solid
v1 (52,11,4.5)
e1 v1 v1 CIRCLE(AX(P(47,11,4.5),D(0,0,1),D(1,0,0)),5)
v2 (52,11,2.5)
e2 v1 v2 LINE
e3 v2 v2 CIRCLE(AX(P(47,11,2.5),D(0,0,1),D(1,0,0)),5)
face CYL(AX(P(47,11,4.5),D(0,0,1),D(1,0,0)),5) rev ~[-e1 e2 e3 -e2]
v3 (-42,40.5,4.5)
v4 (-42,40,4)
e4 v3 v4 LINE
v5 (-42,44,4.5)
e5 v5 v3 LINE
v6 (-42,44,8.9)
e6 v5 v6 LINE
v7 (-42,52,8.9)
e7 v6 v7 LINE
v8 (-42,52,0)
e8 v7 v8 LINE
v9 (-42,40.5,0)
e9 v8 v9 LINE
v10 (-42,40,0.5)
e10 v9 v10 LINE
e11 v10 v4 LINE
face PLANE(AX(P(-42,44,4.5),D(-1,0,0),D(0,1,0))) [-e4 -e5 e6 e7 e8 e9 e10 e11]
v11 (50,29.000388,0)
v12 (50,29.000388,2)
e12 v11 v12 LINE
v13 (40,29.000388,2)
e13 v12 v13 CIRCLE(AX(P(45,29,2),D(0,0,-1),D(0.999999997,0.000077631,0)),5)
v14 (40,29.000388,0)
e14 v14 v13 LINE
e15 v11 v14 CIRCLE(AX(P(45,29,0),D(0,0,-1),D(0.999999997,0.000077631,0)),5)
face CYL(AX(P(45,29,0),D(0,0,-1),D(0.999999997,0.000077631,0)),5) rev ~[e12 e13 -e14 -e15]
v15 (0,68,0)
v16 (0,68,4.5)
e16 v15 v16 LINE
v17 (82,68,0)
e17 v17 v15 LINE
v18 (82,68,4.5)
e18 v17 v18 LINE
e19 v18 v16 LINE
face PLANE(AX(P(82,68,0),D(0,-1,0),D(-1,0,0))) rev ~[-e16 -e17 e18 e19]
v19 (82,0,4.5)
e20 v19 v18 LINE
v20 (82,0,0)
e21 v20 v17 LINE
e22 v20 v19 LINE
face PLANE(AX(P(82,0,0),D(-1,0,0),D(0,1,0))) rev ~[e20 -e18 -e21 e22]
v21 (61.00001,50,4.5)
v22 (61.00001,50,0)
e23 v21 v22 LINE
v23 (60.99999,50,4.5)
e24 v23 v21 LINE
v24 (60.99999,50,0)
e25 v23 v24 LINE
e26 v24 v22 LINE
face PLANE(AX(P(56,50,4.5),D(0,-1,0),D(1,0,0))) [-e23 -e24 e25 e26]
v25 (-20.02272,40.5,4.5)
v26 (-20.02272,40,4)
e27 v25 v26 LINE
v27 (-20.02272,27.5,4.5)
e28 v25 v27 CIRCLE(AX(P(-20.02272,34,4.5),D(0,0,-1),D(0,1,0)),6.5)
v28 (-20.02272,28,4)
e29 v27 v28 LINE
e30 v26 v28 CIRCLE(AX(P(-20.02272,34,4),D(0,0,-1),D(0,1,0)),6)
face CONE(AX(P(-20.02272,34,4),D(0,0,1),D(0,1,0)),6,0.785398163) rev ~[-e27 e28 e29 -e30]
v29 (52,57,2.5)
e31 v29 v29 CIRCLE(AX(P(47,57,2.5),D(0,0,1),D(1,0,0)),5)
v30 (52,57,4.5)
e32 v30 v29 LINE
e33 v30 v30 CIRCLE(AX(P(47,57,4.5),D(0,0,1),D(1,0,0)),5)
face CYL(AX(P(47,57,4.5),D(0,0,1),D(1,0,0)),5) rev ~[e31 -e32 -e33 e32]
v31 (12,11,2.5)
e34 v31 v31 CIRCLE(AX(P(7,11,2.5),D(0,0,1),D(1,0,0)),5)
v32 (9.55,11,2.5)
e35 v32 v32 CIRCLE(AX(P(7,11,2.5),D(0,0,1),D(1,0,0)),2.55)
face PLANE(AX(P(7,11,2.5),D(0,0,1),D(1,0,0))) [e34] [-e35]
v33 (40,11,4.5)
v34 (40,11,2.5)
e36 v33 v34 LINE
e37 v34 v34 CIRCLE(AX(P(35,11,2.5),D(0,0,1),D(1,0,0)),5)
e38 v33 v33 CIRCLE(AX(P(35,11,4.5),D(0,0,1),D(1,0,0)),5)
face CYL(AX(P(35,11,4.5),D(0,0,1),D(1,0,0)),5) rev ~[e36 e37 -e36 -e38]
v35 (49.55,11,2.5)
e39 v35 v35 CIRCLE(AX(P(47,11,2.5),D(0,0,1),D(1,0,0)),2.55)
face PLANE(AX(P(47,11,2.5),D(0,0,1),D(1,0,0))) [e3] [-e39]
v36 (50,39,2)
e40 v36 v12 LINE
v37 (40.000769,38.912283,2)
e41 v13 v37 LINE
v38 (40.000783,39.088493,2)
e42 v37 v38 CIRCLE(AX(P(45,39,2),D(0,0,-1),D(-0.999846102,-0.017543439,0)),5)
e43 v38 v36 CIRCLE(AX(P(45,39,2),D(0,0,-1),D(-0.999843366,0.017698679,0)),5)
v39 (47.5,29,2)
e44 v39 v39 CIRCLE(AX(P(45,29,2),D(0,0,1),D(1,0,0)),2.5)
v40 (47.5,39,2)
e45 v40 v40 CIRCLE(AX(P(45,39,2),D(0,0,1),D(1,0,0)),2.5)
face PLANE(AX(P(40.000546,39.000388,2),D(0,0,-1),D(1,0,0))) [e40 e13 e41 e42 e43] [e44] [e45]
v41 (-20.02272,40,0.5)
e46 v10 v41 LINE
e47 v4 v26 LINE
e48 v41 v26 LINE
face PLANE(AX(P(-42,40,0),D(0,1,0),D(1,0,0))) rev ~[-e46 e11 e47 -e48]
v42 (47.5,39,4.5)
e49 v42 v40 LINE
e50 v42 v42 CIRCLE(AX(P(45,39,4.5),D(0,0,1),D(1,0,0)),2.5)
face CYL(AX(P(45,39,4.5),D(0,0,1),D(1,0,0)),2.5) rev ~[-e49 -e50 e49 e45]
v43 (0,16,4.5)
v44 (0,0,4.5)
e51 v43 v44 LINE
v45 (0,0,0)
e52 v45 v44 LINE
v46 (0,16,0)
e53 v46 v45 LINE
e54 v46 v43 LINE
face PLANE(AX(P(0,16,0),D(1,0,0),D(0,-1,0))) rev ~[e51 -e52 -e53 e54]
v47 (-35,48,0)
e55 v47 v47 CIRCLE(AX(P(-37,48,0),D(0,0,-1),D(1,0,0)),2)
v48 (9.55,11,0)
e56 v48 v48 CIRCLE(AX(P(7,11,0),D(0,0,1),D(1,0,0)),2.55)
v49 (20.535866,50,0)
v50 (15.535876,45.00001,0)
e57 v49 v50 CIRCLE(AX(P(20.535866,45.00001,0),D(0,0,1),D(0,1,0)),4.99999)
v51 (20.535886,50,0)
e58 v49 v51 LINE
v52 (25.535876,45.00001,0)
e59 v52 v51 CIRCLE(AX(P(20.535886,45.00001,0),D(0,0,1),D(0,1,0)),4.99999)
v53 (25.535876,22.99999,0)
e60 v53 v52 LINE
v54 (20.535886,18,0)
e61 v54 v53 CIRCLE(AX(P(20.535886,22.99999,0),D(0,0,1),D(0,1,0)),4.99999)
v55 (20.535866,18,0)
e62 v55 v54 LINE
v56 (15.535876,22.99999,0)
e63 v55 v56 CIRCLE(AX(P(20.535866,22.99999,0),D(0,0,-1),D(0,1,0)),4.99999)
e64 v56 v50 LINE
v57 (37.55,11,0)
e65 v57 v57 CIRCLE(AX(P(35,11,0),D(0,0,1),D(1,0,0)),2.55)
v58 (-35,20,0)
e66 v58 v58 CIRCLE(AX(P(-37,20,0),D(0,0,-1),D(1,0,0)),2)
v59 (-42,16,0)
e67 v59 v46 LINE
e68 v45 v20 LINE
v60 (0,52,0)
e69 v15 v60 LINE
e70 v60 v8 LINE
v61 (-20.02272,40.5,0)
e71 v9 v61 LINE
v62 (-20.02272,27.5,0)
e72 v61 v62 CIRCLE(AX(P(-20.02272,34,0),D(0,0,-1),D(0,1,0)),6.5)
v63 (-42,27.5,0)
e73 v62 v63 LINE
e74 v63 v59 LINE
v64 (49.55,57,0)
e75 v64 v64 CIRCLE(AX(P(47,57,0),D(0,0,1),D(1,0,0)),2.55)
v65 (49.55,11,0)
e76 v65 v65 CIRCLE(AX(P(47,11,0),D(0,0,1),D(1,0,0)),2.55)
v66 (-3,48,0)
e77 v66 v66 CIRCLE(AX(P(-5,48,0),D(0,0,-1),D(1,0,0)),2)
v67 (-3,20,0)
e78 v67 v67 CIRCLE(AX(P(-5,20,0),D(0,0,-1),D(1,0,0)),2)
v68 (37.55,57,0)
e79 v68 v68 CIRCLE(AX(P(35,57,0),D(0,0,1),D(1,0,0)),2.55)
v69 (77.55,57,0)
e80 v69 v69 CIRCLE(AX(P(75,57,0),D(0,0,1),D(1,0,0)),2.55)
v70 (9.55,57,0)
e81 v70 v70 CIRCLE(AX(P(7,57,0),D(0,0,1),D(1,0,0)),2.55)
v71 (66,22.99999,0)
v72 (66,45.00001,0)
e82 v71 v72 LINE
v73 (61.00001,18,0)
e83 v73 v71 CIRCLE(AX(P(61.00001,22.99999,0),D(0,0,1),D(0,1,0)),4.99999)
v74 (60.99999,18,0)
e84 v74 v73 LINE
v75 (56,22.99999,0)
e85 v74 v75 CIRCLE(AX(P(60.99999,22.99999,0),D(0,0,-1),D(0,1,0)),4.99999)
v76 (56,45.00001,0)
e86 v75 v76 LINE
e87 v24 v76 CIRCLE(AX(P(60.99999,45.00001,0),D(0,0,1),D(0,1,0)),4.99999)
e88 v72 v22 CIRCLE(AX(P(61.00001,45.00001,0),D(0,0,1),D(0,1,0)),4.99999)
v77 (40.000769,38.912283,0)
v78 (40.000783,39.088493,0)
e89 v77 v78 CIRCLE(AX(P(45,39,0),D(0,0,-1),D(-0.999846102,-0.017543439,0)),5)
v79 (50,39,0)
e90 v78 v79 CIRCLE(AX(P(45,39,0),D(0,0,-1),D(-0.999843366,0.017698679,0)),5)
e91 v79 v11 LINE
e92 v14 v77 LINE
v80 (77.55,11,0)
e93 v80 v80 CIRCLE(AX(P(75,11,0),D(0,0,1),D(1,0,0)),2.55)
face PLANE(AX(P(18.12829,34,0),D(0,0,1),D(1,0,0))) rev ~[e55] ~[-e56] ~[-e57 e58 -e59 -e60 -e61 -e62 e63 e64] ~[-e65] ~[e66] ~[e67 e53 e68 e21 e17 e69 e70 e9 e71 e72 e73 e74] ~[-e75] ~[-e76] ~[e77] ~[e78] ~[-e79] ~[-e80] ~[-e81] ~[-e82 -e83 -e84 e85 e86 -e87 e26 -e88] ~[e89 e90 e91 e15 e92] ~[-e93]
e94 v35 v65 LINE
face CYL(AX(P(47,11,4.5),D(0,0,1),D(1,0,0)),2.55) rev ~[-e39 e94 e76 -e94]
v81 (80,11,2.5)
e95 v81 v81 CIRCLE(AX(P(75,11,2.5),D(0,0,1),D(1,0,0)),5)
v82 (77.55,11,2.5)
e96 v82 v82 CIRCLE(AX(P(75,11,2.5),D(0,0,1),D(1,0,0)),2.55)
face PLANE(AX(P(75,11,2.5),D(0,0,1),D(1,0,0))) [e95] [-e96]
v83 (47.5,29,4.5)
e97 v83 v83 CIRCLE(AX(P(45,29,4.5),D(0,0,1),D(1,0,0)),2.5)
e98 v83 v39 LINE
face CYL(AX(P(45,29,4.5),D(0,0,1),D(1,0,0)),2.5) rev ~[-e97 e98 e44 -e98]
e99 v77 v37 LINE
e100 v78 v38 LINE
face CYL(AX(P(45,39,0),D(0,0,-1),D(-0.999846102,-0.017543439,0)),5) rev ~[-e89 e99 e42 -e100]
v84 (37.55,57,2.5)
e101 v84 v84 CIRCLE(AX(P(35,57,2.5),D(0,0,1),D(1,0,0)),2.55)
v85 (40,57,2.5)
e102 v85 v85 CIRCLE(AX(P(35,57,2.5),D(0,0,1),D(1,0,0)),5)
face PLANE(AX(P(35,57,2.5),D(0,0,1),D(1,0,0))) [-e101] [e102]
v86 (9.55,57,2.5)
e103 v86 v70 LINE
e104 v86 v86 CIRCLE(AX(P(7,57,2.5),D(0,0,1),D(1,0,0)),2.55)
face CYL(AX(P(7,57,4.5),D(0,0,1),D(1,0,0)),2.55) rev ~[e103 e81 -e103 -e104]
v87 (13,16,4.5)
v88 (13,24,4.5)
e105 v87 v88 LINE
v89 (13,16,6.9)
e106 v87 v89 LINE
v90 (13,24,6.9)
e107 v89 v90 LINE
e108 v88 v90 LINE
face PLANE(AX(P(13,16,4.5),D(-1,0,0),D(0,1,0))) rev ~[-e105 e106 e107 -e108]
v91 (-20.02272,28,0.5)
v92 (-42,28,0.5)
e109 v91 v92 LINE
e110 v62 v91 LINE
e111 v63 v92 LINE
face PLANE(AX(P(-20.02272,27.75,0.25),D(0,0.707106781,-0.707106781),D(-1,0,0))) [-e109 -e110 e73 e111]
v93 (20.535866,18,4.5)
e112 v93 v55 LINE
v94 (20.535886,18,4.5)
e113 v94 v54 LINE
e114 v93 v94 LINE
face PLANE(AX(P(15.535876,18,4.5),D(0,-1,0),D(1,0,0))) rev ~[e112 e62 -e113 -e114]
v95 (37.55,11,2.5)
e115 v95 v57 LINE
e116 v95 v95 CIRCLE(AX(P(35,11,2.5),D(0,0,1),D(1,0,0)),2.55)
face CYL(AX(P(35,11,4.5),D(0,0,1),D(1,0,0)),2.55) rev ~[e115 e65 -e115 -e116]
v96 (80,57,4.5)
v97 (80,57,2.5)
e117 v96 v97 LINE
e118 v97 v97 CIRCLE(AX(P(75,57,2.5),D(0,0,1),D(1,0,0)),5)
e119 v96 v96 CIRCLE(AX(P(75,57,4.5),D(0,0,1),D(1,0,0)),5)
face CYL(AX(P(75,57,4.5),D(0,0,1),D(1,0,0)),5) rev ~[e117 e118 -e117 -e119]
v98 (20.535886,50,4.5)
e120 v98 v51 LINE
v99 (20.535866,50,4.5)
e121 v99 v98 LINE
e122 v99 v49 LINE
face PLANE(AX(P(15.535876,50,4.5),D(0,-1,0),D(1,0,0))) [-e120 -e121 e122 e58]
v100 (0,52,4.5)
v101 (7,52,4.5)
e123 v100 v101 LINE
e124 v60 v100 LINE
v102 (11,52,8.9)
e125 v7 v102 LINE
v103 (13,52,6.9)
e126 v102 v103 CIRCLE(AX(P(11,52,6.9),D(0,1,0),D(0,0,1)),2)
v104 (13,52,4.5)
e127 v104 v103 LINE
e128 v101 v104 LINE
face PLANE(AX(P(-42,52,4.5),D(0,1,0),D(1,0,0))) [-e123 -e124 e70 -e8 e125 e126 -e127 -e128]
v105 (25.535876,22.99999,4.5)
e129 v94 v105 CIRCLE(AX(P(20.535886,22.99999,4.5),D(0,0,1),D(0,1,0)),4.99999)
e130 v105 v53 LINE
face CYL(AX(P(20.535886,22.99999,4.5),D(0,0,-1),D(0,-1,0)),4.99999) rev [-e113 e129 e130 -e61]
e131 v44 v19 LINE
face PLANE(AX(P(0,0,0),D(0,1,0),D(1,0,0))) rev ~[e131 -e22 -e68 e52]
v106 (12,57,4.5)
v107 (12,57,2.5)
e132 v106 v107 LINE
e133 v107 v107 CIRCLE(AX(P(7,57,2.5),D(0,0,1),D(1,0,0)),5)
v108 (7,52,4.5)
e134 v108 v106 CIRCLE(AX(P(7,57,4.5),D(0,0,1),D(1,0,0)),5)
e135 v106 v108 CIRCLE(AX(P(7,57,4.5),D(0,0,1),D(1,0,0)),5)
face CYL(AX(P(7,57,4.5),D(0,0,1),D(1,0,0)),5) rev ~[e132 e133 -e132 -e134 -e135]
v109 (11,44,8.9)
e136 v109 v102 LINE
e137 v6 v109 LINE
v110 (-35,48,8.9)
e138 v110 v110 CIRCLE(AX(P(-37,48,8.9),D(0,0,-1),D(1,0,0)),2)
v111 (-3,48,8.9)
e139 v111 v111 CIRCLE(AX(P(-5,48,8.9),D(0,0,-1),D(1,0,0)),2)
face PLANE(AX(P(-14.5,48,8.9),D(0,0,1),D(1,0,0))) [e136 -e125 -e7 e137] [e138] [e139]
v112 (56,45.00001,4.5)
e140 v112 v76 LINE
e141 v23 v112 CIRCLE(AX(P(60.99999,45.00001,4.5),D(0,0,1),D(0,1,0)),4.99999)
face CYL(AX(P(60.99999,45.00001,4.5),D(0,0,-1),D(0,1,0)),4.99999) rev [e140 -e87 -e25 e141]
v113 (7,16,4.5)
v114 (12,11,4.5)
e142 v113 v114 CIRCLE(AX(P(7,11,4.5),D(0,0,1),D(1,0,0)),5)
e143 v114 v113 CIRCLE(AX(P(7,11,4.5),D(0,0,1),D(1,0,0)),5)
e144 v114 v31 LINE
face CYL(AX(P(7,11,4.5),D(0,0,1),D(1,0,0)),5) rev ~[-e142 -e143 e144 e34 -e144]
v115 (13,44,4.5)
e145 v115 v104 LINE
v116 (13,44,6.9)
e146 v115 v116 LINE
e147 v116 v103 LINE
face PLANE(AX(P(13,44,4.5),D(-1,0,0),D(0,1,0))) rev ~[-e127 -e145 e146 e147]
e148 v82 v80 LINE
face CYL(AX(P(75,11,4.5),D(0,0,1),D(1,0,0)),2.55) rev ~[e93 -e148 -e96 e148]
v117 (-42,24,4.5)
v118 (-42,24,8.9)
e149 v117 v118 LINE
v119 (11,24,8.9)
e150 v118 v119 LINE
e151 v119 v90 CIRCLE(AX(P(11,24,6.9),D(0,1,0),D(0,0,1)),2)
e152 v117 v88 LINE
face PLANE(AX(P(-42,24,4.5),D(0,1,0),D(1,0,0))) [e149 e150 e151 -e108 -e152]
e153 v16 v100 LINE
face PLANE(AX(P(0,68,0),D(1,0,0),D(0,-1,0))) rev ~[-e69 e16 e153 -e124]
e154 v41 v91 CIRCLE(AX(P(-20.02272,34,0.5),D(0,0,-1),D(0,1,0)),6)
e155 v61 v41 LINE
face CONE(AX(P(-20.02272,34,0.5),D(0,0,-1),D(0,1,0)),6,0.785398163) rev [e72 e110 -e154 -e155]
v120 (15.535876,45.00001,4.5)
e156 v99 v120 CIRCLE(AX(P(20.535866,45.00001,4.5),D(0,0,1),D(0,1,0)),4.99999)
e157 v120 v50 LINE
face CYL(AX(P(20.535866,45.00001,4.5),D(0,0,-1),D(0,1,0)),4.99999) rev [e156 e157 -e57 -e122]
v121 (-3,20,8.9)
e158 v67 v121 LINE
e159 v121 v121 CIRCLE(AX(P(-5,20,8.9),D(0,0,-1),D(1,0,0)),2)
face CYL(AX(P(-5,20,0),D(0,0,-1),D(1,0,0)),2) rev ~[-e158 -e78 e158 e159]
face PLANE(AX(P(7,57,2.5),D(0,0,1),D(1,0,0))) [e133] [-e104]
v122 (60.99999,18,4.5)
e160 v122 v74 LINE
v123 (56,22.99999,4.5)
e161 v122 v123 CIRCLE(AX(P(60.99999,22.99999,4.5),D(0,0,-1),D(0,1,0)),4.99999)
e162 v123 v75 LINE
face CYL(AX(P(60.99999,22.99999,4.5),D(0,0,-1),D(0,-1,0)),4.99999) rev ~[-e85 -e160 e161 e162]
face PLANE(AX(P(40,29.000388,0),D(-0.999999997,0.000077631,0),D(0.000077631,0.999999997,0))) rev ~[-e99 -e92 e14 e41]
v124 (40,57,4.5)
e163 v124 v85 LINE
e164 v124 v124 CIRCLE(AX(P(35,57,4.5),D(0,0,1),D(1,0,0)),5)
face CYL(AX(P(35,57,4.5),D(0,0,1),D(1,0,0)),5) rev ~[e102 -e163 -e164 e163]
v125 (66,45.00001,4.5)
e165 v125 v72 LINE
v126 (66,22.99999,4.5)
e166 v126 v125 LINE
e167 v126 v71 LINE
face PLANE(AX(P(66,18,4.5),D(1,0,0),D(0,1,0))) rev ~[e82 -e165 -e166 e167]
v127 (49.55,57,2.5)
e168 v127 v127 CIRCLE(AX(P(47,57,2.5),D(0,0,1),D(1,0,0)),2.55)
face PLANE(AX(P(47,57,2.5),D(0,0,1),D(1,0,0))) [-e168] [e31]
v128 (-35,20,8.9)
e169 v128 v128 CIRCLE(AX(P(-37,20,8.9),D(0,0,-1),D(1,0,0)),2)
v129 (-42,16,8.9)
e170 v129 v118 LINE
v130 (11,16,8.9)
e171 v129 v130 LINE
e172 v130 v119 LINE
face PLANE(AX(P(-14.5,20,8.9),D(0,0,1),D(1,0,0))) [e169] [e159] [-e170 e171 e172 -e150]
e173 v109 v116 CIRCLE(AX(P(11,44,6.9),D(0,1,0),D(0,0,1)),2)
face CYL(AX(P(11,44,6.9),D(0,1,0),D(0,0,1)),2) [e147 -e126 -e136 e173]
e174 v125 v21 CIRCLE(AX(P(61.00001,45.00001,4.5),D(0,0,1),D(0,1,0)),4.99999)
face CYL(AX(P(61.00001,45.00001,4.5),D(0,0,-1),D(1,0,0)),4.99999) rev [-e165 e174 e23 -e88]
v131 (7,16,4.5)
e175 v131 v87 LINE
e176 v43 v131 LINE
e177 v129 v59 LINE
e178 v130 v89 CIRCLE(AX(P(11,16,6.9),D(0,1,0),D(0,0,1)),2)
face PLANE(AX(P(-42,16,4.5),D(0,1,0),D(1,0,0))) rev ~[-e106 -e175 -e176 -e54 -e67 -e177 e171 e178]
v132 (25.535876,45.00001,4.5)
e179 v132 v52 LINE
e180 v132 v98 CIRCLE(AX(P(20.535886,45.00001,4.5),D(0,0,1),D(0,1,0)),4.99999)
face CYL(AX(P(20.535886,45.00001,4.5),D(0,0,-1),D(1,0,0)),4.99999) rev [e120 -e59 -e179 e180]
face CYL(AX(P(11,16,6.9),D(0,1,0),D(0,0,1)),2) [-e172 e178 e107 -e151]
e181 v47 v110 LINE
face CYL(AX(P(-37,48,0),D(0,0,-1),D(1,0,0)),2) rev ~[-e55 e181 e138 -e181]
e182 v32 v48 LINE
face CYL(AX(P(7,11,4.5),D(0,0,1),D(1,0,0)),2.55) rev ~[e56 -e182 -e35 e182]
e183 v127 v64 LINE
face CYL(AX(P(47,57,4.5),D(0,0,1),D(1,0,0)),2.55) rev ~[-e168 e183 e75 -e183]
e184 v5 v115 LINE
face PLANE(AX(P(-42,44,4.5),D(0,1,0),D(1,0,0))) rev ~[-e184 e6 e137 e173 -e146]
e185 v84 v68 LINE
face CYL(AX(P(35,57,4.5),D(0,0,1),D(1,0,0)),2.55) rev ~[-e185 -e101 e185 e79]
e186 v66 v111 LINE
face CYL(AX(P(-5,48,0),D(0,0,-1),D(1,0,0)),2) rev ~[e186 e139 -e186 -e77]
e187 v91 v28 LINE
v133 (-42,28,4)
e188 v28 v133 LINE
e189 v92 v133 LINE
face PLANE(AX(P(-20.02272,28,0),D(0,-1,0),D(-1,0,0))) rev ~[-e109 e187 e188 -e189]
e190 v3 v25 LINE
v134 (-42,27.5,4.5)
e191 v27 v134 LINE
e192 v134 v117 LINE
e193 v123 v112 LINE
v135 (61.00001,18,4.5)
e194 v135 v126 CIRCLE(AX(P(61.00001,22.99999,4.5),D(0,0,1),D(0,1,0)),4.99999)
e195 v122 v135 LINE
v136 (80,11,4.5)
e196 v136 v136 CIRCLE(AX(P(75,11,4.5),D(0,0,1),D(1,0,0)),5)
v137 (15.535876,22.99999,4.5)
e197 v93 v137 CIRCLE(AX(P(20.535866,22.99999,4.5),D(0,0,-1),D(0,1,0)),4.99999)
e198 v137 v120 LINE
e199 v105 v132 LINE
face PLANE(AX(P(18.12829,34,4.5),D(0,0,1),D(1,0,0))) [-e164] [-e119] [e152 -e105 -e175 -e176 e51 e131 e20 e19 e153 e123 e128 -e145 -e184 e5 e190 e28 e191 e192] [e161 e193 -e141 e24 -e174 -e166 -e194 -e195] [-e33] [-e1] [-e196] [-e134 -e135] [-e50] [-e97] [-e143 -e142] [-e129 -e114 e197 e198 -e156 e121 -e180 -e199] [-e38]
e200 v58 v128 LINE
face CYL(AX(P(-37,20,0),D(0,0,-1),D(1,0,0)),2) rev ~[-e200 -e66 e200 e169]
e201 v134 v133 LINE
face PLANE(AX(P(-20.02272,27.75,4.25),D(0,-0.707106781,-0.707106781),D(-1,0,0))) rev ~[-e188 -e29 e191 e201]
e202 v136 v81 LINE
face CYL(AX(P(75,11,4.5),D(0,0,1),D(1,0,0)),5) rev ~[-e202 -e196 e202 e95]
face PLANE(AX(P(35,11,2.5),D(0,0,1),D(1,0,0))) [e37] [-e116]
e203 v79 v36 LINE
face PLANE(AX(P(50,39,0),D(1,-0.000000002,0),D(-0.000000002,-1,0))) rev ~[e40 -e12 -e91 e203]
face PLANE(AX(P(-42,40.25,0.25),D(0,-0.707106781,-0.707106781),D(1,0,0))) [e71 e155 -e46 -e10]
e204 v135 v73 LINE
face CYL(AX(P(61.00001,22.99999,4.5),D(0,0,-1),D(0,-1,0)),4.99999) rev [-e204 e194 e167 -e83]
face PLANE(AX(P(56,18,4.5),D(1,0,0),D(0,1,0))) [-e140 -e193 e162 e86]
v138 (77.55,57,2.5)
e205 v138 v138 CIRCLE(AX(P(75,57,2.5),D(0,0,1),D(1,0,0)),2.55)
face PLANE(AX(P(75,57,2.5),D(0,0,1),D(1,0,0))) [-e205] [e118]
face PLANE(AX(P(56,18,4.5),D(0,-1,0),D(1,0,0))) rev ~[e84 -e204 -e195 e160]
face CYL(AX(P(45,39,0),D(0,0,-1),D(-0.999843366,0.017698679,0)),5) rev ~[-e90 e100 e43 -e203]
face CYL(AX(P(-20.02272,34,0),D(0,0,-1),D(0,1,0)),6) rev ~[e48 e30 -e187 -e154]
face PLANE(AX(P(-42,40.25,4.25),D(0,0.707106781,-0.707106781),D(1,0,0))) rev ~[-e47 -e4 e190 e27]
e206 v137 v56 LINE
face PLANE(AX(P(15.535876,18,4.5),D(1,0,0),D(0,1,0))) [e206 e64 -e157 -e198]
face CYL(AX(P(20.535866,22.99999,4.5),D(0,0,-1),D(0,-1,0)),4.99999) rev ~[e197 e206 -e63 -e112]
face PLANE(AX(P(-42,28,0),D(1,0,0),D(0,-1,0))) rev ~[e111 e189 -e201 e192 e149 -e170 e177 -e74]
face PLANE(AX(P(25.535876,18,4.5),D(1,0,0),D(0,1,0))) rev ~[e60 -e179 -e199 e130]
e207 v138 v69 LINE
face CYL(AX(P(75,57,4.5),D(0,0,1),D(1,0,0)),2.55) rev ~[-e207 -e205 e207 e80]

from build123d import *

# Parameters (mm, degrees)
F1_DEPTH  = 4.5
F2_R      = 2.55
F3_DEPTH  = 25
F4_W      = 55
F4_H      = 8
F5_DEPTH  = 4.4
F6_R      = 2.5
F7_DEPTH  = 25
F8_R      = 2
F9_DEPTH  = 25
F10_W     = 10
F10_H     = 32
F11_DEPTH = 25
F12_R     = 4.99999
F13_R     = 4.99999
F14_R     = 2
F15_R     = 5
F16_DEPTH = 2
F18_DEPTH = 2
F19_SIZE  = 0.5
F20_SIZE  = 0.5
F21_DEPTH = 25


# Not quite as in the source:
# - a fillet or chamfer is up to 0.001 mm smaller than in the source, because OpenCascade refuses the exact size


with BuildPart() as f1:
    # F0 (on Top) → F1 (new body)
    with BuildSketch(Plane.XY):
        with BuildLine():
            Line((0, 16), (0, 0))
            Line((0, 0), (82, 0))
            Line((82, 0), (82, 68))
            Line((82, 68), (0, 68))
            Line((0, 68), (0, 52))
            Line((0, 52), (-42, 52))
            Line((-42, 52), (-42, 40))
            Line((-42, 40), (-20.0227203867, 40))
            ThreePointArc((-20.0227203867, 40), (-14.0227203867, 34), (-20.0227203867, 28))
            Line((-20.0227203867, 28), (-42, 28))
            Line((-42, 28), (-42, 16))
            Line((-42, 16), (0, 16))
        make_face()
    extrude(amount=F1_DEPTH)

    # F2 (on face) → F3 (cut)
    with BuildSketch(Plane.XY.offset(4.5)):
        with Locations((75, 57)):
            Circle(F2_R)
        with Locations((75, 11)):
            Circle(F2_R)
        with Locations((47, 57)):
            Circle(F2_R)
        with Locations((47, 11)):
            Circle(F2_R)
        with Locations((35, 57)):
            Circle(F2_R)
        with Locations((35, 11)):
            Circle(F2_R)
        with Locations((7, 57)):
            Circle(F2_R)
        with Locations((7, 11)):
            Circle(F2_R)
    extrude(amount=-F3_DEPTH, mode=Mode.SUBTRACT)

    # F4 (on face) → F5 (join)
    with BuildSketch(Plane.XY.offset(4.5)):
        with Locations((-14.5, 48)):
            Rectangle(F4_W, F4_H)
        with Locations((-14.5, 20)):
            Rectangle(F4_W, F4_H)
    extrude(amount=F5_DEPTH)

    # F6 (on face) → F7 (cut)
    with BuildSketch(Plane.XY.offset(4.5)):
        with Locations((45, 29)):
            Circle(F6_R)
        with Locations((45, 39)):
            Circle(F6_R)
    extrude(amount=-F7_DEPTH, mode=Mode.SUBTRACT)

    # F8 (on face) → F9 (cut)
    with BuildSketch(Plane(origin=(0, 0, 0), x_dir=(1, 0, 0), z_dir=(0, 0, -1))):
        with Locations((-37, -48)):
            Circle(F8_R)
        with Locations((-5, -48)):
            Circle(F8_R)
        with Locations((-37, -20)):
            Circle(F8_R)
        with Locations((-5, -20)):
            Circle(F8_R)
    extrude(amount=-F9_DEPTH, mode=Mode.SUBTRACT)

    # F10 (on face) → F11 (cut)
    with BuildSketch(Plane.XY.offset(4.5)):
        with Locations((61, 34)):
            Rectangle(F10_W, F10_H)
        with Locations((20.5358764028, 34)):
            Rectangle(F10_W, F10_H)
    extrude(amount=-F11_DEPTH, mode=Mode.SUBTRACT)

    # F12 (radius 5 in the source; OpenCascade refuses exactly that, so slightly less here)
    f12_edges = [f1.edges().sort_by_distance(p)[0] for p in [
        (15.535876, 50, 2.25),
        (25.535876, 50, 2.25),
        (15.535876, 18, 2.25),
        (25.535876, 18, 2.25),
    ]]
    fillet(f12_edges, radius=F12_R)

    # F13 (radius 5 in the source; OpenCascade refuses exactly that, so slightly less here)
    f13_edges = [f1.edges().sort_by_distance(p)[0] for p in [
        (56, 18, 2.25),
        (66, 18, 2.25),
        (66, 50, 2.25),
        (56, 50, 2.25),
    ]]
    fillet(f13_edges, radius=F13_R)

    # F14
    f14_edges = [f1.edges().sort_by_distance(p)[0] for p in [
        (13, 48, 8.9),
        (13, 20, 8.9),
    ]]
    fillet(f14_edges, radius=F14_R)

    # F15 (on face) → F16 (cut)
    with BuildSketch(Plane.XY.offset(4.5)):
        with Locations((75, 11)):
            Circle(F15_R)
        with Locations((47, 11)):
            Circle(F15_R)
        with Locations((35, 11)):
            Circle(F15_R)
        with Locations((7, 11)):
            Circle(F15_R)
        with Locations((7, 57)):
            Circle(F15_R)
        with Locations((35, 57)):
            Circle(F15_R)
        with Locations((47, 57)):
            Circle(F15_R)
        with Locations((75, 57)):
            Circle(F15_R)
    extrude(amount=-F16_DEPTH, mode=Mode.SUBTRACT)

    # F17 (on face) → F18 (cut)
    with BuildSketch(Plane(origin=(0, 0, 0), x_dir=(1, 0, 0), z_dir=(0, 0, -1))):
        with BuildLine():
            Line((40.0007831694, -39.0884933935), (40.0007694899, -38.9122828006))
            ThreePointArc((40.0007694899, -38.9122828006), (40.0000000151, -39.0003881573), (40.0007831694, -39.0884933935))
        make_face()
        with BuildLine():
            Line((40.0000000151, -29.0003881573), (40.0007694899, -38.9122828006))
            Line((40.0007694899, -38.9122828006), (40.0007831694, -39.0884933935))
            ThreePointArc((40.0007831694, -39.0884933935), (45.0442484332, -43.9998042038), (50, -38.9999999925))
            Line((50, -38.9999999925), (49.9999999849, -29.0003881573))
            ThreePointArc((49.9999999849, -29.0003881573), (45, -24), (40.0000000151, -29.0003881573))
        make_face()
    extrude(amount=-F18_DEPTH, mode=Mode.SUBTRACT)

    # F19
    f19_edges = [f1.edges().sort_by_distance(p)[0] for p in [
        (-31.01136, 28, 4.5),
        (-31.01136, 40, 4.5),
        (-14.02272, 34, 4.5),
    ]]
    chamfer(f19_edges, length=F19_SIZE)

    # F20
    f20_edges = [f1.edges().sort_by_distance(p)[0] for p in [
        (-31.01136, 40, 0),
        (-31.01136, 28, 0),
        (-14.02272, 34, 0),
    ]]
    chamfer(f20_edges, length=F20_SIZE)

    # F8 (on face) → F21 (cut)
    with BuildSketch(Plane(origin=(0, 0, 0), x_dir=(1, 0, 0), z_dir=(0, 0, -1))):
        with Locations((-37, -48)):
            Circle(F8_R)
        with Locations((-5, -48)):
            Circle(F8_R)
        with Locations((-37, -20)):
            Circle(F8_R)
        with Locations((-5, -20)):
            Circle(F8_R)
    extrude(amount=-F21_DEPTH, mode=Mode.SUBTRACT)


solid = f1.part
